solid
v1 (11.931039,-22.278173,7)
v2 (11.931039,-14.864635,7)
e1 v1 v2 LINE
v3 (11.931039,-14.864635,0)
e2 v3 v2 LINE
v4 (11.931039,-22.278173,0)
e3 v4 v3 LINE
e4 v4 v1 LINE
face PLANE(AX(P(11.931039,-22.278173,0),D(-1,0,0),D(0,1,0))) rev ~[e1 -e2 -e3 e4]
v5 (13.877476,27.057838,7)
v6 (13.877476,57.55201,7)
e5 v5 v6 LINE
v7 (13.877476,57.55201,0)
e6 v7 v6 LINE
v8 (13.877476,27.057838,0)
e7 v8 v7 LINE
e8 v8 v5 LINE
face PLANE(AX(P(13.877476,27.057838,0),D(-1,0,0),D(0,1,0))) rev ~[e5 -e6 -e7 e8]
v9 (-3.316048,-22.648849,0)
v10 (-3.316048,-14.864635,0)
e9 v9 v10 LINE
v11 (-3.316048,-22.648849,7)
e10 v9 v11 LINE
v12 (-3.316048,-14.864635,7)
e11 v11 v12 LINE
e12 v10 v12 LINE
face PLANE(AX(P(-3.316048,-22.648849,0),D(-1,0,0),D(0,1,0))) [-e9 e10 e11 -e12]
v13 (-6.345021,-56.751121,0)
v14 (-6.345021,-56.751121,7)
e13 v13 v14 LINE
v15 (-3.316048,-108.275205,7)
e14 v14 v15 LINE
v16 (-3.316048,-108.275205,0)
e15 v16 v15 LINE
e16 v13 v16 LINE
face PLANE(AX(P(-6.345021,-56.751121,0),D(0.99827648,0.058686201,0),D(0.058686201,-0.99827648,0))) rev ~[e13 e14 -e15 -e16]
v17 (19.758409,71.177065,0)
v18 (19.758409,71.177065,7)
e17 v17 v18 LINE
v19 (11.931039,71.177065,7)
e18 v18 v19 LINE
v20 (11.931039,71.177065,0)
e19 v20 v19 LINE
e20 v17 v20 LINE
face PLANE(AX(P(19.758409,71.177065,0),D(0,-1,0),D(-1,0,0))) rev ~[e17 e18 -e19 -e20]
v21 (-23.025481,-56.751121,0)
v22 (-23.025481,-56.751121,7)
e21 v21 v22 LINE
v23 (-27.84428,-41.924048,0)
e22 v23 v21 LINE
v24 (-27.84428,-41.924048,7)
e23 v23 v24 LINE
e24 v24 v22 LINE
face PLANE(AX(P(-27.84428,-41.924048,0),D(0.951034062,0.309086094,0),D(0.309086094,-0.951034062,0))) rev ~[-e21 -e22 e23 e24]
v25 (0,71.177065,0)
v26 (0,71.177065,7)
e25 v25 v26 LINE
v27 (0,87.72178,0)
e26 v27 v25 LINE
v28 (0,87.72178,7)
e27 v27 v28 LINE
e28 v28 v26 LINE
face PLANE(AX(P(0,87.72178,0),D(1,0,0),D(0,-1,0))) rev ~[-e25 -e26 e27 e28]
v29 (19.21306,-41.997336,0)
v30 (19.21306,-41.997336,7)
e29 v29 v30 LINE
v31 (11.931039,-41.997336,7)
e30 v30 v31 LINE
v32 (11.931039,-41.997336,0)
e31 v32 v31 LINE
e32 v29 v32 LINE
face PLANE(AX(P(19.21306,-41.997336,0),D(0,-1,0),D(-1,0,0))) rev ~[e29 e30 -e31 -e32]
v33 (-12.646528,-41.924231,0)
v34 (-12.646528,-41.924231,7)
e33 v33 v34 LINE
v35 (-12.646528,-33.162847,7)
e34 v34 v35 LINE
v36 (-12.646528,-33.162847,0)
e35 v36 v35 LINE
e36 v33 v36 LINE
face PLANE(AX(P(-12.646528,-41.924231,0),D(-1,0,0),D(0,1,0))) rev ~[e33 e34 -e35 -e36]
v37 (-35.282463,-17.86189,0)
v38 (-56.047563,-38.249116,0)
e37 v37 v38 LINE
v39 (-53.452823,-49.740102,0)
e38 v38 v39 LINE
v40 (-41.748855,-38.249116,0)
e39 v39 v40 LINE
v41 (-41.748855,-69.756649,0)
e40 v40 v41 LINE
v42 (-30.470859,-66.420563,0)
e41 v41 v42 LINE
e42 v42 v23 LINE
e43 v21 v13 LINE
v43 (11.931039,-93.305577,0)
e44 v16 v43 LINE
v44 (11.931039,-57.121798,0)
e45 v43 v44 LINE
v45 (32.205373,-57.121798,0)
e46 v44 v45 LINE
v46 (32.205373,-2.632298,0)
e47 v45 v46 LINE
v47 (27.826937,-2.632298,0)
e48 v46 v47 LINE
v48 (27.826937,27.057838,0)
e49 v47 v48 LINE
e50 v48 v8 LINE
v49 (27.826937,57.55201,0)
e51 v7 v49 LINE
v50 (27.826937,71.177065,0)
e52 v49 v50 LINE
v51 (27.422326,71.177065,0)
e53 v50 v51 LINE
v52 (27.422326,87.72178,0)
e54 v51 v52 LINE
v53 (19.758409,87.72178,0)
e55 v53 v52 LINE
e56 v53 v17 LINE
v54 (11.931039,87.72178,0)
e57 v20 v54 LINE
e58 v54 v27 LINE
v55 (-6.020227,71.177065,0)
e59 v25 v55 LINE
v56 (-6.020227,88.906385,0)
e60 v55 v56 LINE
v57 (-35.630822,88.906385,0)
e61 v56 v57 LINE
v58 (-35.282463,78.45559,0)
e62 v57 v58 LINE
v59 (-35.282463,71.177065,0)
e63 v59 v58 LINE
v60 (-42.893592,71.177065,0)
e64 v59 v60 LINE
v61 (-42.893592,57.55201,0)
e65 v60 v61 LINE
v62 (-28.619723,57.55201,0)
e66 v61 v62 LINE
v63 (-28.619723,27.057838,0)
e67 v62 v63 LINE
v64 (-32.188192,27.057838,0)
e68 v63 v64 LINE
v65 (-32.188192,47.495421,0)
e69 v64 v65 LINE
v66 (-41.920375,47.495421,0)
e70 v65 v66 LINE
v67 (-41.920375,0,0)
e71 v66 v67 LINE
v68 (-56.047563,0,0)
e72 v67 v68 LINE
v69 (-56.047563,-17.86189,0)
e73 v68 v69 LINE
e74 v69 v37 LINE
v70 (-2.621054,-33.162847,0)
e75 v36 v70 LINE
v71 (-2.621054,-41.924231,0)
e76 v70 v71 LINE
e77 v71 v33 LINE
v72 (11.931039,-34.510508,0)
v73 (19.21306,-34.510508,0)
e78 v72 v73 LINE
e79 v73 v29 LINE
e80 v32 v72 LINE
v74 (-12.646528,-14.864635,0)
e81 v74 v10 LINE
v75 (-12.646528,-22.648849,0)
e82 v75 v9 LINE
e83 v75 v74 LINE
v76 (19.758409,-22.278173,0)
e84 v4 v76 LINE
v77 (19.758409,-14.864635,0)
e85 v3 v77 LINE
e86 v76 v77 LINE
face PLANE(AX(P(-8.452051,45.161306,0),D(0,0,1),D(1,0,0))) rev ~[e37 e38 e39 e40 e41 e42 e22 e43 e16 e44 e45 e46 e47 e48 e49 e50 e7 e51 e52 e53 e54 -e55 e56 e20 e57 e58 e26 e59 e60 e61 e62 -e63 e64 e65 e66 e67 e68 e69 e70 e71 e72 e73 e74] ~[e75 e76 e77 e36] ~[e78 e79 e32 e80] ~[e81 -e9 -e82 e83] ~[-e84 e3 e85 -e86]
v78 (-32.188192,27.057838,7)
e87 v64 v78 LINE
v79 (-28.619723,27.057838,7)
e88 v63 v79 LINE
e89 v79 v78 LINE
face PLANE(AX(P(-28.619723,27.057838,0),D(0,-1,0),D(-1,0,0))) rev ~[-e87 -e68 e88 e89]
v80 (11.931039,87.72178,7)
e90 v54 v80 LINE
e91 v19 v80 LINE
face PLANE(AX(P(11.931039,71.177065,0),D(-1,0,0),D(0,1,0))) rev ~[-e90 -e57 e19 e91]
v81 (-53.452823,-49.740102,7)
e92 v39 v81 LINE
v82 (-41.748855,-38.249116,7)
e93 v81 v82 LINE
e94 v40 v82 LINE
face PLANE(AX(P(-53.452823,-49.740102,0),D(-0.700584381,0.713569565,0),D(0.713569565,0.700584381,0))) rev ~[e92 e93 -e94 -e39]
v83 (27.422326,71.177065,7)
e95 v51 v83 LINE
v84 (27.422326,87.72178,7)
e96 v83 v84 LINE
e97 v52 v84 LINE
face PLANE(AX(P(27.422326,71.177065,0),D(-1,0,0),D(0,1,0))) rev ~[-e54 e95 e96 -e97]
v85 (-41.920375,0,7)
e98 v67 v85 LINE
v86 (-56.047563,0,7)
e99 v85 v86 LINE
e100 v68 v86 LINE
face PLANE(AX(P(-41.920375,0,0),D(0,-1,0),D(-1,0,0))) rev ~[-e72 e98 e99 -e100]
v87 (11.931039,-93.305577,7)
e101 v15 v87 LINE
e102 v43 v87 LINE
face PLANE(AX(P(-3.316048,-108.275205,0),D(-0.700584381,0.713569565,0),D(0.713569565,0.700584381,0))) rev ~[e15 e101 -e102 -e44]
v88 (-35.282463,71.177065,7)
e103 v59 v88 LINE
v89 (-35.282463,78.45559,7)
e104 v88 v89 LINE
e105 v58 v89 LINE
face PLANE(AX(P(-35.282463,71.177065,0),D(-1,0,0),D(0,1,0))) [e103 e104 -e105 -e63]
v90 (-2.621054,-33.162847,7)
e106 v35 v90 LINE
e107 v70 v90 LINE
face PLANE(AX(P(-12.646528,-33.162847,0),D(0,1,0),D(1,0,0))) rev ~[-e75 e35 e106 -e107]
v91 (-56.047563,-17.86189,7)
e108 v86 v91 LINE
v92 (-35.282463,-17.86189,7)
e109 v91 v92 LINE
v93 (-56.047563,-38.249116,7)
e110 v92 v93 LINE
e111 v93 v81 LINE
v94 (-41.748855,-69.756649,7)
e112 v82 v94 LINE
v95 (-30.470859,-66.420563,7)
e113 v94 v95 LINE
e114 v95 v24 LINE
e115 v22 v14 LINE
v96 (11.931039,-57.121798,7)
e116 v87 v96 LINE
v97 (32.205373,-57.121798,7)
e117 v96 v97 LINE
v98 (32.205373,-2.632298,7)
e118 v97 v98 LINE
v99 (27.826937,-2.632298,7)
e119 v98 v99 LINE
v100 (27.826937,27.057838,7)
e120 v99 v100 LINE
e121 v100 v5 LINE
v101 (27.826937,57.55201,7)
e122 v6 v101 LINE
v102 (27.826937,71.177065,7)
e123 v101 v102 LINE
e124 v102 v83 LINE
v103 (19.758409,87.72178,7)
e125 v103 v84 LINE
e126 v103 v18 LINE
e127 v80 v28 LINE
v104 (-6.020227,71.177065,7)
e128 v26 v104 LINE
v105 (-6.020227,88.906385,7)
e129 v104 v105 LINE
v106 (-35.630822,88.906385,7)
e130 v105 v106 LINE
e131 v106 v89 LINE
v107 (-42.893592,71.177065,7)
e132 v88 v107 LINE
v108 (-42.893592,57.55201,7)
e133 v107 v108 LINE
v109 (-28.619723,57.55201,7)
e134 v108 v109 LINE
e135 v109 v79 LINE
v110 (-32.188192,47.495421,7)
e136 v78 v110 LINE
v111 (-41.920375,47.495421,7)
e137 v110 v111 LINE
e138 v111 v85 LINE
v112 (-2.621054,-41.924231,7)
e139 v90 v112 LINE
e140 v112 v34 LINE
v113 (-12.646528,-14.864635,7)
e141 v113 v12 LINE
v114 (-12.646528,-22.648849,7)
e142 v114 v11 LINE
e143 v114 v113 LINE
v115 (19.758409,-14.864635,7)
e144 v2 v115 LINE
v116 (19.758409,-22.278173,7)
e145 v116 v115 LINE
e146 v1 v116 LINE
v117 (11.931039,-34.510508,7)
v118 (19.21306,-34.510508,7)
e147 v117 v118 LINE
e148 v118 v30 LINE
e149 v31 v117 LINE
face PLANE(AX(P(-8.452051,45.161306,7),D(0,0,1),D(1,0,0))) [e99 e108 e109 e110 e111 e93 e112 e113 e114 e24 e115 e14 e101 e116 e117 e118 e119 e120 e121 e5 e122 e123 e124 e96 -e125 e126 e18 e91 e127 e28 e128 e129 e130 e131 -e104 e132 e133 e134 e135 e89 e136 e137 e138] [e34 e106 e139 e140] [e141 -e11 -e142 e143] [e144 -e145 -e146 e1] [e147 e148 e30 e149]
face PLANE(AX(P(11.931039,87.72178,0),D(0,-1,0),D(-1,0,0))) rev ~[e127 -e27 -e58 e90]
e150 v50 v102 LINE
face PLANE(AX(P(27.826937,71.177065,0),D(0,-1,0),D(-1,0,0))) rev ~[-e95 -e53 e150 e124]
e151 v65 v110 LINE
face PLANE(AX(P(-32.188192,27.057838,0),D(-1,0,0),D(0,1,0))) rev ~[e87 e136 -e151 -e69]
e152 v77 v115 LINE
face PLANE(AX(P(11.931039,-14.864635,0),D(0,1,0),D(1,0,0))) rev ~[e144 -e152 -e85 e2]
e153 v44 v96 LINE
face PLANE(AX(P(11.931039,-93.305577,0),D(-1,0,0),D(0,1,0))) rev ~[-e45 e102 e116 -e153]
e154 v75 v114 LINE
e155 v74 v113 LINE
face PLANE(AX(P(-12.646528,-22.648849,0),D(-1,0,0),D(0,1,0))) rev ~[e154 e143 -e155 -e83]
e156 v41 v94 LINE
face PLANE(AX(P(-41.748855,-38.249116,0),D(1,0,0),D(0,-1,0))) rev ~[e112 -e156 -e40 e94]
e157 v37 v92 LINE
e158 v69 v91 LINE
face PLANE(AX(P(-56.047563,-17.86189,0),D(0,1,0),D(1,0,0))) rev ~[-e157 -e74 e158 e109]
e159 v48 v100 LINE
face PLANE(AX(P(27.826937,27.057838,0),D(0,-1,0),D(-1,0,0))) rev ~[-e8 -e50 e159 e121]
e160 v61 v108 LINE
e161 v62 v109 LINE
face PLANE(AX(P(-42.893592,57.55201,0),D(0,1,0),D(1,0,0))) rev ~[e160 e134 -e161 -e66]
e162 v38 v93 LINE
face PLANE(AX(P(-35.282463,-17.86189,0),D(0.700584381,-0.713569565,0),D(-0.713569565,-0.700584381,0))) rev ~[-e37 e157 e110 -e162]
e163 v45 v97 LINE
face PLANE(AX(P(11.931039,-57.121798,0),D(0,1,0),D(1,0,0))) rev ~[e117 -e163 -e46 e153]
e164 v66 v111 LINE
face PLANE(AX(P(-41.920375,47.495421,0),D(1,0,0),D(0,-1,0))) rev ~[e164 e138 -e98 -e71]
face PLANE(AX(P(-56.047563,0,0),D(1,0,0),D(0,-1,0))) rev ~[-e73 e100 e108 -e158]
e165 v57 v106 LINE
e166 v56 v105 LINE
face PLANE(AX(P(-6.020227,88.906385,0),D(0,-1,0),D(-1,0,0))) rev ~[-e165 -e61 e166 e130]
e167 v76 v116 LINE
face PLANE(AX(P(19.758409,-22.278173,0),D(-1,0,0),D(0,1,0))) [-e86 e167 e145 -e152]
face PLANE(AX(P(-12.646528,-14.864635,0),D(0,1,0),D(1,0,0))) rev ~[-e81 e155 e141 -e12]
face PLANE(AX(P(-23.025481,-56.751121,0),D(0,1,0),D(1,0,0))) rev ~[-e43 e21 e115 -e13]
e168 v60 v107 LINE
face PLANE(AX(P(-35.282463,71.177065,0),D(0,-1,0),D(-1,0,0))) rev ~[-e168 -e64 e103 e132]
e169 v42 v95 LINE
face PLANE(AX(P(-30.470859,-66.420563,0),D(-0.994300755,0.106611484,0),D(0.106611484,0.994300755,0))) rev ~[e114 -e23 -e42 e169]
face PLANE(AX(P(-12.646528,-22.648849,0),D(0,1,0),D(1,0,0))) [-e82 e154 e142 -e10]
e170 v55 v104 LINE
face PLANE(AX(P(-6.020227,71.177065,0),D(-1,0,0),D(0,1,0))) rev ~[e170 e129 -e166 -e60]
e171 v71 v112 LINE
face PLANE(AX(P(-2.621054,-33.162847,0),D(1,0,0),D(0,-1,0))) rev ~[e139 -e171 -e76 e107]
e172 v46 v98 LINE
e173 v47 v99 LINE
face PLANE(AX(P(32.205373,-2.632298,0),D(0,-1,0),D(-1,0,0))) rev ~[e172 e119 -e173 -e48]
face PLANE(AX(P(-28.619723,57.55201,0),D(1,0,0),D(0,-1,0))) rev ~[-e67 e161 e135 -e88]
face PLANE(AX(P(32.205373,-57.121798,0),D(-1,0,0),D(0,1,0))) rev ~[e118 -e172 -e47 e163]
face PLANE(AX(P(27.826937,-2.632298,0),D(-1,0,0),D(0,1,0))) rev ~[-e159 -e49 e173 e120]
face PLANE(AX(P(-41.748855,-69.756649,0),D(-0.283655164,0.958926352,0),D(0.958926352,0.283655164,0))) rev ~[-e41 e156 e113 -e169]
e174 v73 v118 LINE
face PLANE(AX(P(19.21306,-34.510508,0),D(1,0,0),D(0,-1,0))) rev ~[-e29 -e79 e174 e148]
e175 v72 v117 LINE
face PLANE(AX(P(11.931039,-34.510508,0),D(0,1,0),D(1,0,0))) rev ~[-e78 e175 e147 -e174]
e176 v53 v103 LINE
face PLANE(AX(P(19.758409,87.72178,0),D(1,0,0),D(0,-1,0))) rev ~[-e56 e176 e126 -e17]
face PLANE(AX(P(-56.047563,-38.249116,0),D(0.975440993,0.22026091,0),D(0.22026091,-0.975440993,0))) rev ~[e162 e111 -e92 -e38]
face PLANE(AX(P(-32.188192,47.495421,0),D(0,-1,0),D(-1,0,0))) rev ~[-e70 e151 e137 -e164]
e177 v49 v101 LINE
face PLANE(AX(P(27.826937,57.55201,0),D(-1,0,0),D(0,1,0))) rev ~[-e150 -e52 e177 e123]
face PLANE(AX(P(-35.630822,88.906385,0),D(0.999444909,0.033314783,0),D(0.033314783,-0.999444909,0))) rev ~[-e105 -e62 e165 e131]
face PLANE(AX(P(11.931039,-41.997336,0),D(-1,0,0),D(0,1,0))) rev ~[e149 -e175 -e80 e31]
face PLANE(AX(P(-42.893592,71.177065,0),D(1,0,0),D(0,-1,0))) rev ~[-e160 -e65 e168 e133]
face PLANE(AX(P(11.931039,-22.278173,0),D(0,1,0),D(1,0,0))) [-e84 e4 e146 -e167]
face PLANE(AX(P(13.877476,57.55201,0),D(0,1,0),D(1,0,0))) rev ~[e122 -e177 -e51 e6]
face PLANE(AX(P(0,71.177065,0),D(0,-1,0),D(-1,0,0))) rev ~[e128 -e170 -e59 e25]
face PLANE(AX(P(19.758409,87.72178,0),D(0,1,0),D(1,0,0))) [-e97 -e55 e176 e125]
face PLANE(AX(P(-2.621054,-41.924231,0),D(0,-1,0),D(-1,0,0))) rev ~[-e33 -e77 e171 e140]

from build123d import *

# Parameters (mm, degrees)
F1_W     = 9.3304801267
F1_H     = 7.7842138708
F1_W_2   = 7.8273694962
F1_H_2   = 7.4135381728
F1_W_3   = 29.2622358538
F1_H_3   = 7.2785243392
F1_W_4   = 7.6639167964
F1_H_4   = 5.8850795031
F1_H_5   = 10.659635067
F2_DEPTH = 7


# Not quite as in the source:
# - a feature names something its author has since deleted; it is built from what else it names


with BuildPart() as f2:
    # F1 (on Top) → F2 (new body)
    with BuildSketch(Plane.XY):
        Polygon((-41.9203750789, 47.4954210222), (-41.9203750789, 16.0942748189), (-3.3160478342, 16.0942748189), (-3.3160478342, 27.0578376949), (-14.6702602506, 27.0578376949), (-14.6702602506, 34.84358266), (-3.3160478342, 34.84358266), (-3.3160478342, 47.4954210222), (-14.6702602506, 47.4954210222), (-14.6702602506, 57.5520098209), (0, 57.5520098209), (0, 16.0942748189), (27.8269369155, 16.0942748189), (27.8269369155, 18.2988718152), (27.8269369155, 27.0578376949), (13.8774756342, 27.0578376949), (13.8774756342, 57.5520098209), (27.8269369155, 57.5520098209), (27.8269369155, 71.1770653725), (27.4223256856, 71.1770653725), (19.7584088892, 71.1770653725), (11.9310393929, 71.1770653725), (11.9310393929, 87.7217799425), (0, 87.7217799425), (0, 71.1770653725), (-6.0202269815, 71.1770653725), (-35.2824628353, 71.1770653725), (-42.8935922682, 71.1770653725), (-42.8935922682, 57.5520098209), (-28.6197233945, 57.5520098209), (-28.6197233945, 27.0578376949), (-32.1881920099, 27.0578376949), (-32.1881920099, 47.4954210222), align=None)
        Polygon((-3.3160478342, 16.0942748189), (-41.9203750789, 16.0942748189), (-41.9203750789, 0), (-3.3160478342, 0), (-3.3160478342, 12.5654535368), align=None)
        Polygon((-3.3160478342, 27.0578376949), (-3.3160478342, 16.0942748189), (-3.3160478342, 12.5654535368), (11.9310393929, 12.5654535368), (11.9310393929, -2.6322980411), (27.8269369155, -2.6322980411), (27.8269369155, 16.0942748189), (0, 16.0942748189), (0, 57.5520098209), (-14.6702602506, 57.5520098209), (-14.6702602506, 47.4954210222), (-3.3160478342, 47.4954210222), (-3.3160478342, 34.84358266), (-14.6702602506, 34.84358266), (-14.6702602506, 27.0578376949), align=None)
        Polygon((-3.3160478342, 0), (-41.9203750789, 0), (-56.0475625098, 0), (-56.0475625098, -17.8618896753), (-35.2824628353, -17.8618896753), (-56.0475625098, -38.2491163909), (-53.4528233111, -49.7401021421), (-41.7488545561, -38.2491163909), (-41.7488545561, -69.7566494346), (-30.4708592594, -66.4205625653), (-27.8442800045, -41.9240482152), (-23.0254810303, -56.7511208355), (-6.3450210728, -56.7511208355), (-3.3160478342, -108.2752048969), (11.9310393929, -93.3055765817), (11.9310393929, -57.1217983961), (32.2053730488, -57.1217983961), (32.2053730488, -2.6322980411), (27.8269369155, -2.6322980411), (11.9310393929, -2.6322980411), (11.9310393929, 12.5654535368), (-3.3160478342, 12.5654535368), align=None)
        Polygon((-12.6465279609, -38.2491163909), (-12.6465279609, -34.5105081797), (-12.6465279609, -33.1628471613), (-2.621053718, -33.1628471613), (-2.621053718, -41.9242307544), (-12.6465279609, -41.9242307544), align=None, mode=Mode.SUBTRACT)
        with Locations((-7.9812878976, -18.7567416579)):
            Rectangle(F1_W, F1_H, mode=Mode.SUBTRACT)
        Polygon((11.9310393929, -41.9240482152), (11.9310393929, -38.2491163909), (11.9310393929, -34.5105081797), (19.2130599171, -34.5105081797), (19.2130599171, -41.9973358512), (11.9310393929, -41.9973358512), align=None, mode=Mode.SUBTRACT)
        with Locations((15.8447241411, -18.5714038089)):
            Rectangle(F1_W_2, F1_H_2, mode=Mode.SUBTRACT)
        with Locations((-20.6513449084, 74.8163275421)):
            Rectangle(F1_W_3, F1_H_3)
        Polygon((-35.6308221817, 88.9063850045), (-35.2824628353, 78.4555897117), (-6.0202269815, 78.4555897117), (-6.0202269815, 88.9063850045), align=None)
        with Locations((23.5903672874, 74.119605124)):
            Rectangle(F1_W_4, F1_H_4)
        with Locations((23.5903672874, 82.391962409)):
            Rectangle(F1_W_4, F1_H_5)
    extrude(amount=F2_DEPTH)


solid = f2.part
